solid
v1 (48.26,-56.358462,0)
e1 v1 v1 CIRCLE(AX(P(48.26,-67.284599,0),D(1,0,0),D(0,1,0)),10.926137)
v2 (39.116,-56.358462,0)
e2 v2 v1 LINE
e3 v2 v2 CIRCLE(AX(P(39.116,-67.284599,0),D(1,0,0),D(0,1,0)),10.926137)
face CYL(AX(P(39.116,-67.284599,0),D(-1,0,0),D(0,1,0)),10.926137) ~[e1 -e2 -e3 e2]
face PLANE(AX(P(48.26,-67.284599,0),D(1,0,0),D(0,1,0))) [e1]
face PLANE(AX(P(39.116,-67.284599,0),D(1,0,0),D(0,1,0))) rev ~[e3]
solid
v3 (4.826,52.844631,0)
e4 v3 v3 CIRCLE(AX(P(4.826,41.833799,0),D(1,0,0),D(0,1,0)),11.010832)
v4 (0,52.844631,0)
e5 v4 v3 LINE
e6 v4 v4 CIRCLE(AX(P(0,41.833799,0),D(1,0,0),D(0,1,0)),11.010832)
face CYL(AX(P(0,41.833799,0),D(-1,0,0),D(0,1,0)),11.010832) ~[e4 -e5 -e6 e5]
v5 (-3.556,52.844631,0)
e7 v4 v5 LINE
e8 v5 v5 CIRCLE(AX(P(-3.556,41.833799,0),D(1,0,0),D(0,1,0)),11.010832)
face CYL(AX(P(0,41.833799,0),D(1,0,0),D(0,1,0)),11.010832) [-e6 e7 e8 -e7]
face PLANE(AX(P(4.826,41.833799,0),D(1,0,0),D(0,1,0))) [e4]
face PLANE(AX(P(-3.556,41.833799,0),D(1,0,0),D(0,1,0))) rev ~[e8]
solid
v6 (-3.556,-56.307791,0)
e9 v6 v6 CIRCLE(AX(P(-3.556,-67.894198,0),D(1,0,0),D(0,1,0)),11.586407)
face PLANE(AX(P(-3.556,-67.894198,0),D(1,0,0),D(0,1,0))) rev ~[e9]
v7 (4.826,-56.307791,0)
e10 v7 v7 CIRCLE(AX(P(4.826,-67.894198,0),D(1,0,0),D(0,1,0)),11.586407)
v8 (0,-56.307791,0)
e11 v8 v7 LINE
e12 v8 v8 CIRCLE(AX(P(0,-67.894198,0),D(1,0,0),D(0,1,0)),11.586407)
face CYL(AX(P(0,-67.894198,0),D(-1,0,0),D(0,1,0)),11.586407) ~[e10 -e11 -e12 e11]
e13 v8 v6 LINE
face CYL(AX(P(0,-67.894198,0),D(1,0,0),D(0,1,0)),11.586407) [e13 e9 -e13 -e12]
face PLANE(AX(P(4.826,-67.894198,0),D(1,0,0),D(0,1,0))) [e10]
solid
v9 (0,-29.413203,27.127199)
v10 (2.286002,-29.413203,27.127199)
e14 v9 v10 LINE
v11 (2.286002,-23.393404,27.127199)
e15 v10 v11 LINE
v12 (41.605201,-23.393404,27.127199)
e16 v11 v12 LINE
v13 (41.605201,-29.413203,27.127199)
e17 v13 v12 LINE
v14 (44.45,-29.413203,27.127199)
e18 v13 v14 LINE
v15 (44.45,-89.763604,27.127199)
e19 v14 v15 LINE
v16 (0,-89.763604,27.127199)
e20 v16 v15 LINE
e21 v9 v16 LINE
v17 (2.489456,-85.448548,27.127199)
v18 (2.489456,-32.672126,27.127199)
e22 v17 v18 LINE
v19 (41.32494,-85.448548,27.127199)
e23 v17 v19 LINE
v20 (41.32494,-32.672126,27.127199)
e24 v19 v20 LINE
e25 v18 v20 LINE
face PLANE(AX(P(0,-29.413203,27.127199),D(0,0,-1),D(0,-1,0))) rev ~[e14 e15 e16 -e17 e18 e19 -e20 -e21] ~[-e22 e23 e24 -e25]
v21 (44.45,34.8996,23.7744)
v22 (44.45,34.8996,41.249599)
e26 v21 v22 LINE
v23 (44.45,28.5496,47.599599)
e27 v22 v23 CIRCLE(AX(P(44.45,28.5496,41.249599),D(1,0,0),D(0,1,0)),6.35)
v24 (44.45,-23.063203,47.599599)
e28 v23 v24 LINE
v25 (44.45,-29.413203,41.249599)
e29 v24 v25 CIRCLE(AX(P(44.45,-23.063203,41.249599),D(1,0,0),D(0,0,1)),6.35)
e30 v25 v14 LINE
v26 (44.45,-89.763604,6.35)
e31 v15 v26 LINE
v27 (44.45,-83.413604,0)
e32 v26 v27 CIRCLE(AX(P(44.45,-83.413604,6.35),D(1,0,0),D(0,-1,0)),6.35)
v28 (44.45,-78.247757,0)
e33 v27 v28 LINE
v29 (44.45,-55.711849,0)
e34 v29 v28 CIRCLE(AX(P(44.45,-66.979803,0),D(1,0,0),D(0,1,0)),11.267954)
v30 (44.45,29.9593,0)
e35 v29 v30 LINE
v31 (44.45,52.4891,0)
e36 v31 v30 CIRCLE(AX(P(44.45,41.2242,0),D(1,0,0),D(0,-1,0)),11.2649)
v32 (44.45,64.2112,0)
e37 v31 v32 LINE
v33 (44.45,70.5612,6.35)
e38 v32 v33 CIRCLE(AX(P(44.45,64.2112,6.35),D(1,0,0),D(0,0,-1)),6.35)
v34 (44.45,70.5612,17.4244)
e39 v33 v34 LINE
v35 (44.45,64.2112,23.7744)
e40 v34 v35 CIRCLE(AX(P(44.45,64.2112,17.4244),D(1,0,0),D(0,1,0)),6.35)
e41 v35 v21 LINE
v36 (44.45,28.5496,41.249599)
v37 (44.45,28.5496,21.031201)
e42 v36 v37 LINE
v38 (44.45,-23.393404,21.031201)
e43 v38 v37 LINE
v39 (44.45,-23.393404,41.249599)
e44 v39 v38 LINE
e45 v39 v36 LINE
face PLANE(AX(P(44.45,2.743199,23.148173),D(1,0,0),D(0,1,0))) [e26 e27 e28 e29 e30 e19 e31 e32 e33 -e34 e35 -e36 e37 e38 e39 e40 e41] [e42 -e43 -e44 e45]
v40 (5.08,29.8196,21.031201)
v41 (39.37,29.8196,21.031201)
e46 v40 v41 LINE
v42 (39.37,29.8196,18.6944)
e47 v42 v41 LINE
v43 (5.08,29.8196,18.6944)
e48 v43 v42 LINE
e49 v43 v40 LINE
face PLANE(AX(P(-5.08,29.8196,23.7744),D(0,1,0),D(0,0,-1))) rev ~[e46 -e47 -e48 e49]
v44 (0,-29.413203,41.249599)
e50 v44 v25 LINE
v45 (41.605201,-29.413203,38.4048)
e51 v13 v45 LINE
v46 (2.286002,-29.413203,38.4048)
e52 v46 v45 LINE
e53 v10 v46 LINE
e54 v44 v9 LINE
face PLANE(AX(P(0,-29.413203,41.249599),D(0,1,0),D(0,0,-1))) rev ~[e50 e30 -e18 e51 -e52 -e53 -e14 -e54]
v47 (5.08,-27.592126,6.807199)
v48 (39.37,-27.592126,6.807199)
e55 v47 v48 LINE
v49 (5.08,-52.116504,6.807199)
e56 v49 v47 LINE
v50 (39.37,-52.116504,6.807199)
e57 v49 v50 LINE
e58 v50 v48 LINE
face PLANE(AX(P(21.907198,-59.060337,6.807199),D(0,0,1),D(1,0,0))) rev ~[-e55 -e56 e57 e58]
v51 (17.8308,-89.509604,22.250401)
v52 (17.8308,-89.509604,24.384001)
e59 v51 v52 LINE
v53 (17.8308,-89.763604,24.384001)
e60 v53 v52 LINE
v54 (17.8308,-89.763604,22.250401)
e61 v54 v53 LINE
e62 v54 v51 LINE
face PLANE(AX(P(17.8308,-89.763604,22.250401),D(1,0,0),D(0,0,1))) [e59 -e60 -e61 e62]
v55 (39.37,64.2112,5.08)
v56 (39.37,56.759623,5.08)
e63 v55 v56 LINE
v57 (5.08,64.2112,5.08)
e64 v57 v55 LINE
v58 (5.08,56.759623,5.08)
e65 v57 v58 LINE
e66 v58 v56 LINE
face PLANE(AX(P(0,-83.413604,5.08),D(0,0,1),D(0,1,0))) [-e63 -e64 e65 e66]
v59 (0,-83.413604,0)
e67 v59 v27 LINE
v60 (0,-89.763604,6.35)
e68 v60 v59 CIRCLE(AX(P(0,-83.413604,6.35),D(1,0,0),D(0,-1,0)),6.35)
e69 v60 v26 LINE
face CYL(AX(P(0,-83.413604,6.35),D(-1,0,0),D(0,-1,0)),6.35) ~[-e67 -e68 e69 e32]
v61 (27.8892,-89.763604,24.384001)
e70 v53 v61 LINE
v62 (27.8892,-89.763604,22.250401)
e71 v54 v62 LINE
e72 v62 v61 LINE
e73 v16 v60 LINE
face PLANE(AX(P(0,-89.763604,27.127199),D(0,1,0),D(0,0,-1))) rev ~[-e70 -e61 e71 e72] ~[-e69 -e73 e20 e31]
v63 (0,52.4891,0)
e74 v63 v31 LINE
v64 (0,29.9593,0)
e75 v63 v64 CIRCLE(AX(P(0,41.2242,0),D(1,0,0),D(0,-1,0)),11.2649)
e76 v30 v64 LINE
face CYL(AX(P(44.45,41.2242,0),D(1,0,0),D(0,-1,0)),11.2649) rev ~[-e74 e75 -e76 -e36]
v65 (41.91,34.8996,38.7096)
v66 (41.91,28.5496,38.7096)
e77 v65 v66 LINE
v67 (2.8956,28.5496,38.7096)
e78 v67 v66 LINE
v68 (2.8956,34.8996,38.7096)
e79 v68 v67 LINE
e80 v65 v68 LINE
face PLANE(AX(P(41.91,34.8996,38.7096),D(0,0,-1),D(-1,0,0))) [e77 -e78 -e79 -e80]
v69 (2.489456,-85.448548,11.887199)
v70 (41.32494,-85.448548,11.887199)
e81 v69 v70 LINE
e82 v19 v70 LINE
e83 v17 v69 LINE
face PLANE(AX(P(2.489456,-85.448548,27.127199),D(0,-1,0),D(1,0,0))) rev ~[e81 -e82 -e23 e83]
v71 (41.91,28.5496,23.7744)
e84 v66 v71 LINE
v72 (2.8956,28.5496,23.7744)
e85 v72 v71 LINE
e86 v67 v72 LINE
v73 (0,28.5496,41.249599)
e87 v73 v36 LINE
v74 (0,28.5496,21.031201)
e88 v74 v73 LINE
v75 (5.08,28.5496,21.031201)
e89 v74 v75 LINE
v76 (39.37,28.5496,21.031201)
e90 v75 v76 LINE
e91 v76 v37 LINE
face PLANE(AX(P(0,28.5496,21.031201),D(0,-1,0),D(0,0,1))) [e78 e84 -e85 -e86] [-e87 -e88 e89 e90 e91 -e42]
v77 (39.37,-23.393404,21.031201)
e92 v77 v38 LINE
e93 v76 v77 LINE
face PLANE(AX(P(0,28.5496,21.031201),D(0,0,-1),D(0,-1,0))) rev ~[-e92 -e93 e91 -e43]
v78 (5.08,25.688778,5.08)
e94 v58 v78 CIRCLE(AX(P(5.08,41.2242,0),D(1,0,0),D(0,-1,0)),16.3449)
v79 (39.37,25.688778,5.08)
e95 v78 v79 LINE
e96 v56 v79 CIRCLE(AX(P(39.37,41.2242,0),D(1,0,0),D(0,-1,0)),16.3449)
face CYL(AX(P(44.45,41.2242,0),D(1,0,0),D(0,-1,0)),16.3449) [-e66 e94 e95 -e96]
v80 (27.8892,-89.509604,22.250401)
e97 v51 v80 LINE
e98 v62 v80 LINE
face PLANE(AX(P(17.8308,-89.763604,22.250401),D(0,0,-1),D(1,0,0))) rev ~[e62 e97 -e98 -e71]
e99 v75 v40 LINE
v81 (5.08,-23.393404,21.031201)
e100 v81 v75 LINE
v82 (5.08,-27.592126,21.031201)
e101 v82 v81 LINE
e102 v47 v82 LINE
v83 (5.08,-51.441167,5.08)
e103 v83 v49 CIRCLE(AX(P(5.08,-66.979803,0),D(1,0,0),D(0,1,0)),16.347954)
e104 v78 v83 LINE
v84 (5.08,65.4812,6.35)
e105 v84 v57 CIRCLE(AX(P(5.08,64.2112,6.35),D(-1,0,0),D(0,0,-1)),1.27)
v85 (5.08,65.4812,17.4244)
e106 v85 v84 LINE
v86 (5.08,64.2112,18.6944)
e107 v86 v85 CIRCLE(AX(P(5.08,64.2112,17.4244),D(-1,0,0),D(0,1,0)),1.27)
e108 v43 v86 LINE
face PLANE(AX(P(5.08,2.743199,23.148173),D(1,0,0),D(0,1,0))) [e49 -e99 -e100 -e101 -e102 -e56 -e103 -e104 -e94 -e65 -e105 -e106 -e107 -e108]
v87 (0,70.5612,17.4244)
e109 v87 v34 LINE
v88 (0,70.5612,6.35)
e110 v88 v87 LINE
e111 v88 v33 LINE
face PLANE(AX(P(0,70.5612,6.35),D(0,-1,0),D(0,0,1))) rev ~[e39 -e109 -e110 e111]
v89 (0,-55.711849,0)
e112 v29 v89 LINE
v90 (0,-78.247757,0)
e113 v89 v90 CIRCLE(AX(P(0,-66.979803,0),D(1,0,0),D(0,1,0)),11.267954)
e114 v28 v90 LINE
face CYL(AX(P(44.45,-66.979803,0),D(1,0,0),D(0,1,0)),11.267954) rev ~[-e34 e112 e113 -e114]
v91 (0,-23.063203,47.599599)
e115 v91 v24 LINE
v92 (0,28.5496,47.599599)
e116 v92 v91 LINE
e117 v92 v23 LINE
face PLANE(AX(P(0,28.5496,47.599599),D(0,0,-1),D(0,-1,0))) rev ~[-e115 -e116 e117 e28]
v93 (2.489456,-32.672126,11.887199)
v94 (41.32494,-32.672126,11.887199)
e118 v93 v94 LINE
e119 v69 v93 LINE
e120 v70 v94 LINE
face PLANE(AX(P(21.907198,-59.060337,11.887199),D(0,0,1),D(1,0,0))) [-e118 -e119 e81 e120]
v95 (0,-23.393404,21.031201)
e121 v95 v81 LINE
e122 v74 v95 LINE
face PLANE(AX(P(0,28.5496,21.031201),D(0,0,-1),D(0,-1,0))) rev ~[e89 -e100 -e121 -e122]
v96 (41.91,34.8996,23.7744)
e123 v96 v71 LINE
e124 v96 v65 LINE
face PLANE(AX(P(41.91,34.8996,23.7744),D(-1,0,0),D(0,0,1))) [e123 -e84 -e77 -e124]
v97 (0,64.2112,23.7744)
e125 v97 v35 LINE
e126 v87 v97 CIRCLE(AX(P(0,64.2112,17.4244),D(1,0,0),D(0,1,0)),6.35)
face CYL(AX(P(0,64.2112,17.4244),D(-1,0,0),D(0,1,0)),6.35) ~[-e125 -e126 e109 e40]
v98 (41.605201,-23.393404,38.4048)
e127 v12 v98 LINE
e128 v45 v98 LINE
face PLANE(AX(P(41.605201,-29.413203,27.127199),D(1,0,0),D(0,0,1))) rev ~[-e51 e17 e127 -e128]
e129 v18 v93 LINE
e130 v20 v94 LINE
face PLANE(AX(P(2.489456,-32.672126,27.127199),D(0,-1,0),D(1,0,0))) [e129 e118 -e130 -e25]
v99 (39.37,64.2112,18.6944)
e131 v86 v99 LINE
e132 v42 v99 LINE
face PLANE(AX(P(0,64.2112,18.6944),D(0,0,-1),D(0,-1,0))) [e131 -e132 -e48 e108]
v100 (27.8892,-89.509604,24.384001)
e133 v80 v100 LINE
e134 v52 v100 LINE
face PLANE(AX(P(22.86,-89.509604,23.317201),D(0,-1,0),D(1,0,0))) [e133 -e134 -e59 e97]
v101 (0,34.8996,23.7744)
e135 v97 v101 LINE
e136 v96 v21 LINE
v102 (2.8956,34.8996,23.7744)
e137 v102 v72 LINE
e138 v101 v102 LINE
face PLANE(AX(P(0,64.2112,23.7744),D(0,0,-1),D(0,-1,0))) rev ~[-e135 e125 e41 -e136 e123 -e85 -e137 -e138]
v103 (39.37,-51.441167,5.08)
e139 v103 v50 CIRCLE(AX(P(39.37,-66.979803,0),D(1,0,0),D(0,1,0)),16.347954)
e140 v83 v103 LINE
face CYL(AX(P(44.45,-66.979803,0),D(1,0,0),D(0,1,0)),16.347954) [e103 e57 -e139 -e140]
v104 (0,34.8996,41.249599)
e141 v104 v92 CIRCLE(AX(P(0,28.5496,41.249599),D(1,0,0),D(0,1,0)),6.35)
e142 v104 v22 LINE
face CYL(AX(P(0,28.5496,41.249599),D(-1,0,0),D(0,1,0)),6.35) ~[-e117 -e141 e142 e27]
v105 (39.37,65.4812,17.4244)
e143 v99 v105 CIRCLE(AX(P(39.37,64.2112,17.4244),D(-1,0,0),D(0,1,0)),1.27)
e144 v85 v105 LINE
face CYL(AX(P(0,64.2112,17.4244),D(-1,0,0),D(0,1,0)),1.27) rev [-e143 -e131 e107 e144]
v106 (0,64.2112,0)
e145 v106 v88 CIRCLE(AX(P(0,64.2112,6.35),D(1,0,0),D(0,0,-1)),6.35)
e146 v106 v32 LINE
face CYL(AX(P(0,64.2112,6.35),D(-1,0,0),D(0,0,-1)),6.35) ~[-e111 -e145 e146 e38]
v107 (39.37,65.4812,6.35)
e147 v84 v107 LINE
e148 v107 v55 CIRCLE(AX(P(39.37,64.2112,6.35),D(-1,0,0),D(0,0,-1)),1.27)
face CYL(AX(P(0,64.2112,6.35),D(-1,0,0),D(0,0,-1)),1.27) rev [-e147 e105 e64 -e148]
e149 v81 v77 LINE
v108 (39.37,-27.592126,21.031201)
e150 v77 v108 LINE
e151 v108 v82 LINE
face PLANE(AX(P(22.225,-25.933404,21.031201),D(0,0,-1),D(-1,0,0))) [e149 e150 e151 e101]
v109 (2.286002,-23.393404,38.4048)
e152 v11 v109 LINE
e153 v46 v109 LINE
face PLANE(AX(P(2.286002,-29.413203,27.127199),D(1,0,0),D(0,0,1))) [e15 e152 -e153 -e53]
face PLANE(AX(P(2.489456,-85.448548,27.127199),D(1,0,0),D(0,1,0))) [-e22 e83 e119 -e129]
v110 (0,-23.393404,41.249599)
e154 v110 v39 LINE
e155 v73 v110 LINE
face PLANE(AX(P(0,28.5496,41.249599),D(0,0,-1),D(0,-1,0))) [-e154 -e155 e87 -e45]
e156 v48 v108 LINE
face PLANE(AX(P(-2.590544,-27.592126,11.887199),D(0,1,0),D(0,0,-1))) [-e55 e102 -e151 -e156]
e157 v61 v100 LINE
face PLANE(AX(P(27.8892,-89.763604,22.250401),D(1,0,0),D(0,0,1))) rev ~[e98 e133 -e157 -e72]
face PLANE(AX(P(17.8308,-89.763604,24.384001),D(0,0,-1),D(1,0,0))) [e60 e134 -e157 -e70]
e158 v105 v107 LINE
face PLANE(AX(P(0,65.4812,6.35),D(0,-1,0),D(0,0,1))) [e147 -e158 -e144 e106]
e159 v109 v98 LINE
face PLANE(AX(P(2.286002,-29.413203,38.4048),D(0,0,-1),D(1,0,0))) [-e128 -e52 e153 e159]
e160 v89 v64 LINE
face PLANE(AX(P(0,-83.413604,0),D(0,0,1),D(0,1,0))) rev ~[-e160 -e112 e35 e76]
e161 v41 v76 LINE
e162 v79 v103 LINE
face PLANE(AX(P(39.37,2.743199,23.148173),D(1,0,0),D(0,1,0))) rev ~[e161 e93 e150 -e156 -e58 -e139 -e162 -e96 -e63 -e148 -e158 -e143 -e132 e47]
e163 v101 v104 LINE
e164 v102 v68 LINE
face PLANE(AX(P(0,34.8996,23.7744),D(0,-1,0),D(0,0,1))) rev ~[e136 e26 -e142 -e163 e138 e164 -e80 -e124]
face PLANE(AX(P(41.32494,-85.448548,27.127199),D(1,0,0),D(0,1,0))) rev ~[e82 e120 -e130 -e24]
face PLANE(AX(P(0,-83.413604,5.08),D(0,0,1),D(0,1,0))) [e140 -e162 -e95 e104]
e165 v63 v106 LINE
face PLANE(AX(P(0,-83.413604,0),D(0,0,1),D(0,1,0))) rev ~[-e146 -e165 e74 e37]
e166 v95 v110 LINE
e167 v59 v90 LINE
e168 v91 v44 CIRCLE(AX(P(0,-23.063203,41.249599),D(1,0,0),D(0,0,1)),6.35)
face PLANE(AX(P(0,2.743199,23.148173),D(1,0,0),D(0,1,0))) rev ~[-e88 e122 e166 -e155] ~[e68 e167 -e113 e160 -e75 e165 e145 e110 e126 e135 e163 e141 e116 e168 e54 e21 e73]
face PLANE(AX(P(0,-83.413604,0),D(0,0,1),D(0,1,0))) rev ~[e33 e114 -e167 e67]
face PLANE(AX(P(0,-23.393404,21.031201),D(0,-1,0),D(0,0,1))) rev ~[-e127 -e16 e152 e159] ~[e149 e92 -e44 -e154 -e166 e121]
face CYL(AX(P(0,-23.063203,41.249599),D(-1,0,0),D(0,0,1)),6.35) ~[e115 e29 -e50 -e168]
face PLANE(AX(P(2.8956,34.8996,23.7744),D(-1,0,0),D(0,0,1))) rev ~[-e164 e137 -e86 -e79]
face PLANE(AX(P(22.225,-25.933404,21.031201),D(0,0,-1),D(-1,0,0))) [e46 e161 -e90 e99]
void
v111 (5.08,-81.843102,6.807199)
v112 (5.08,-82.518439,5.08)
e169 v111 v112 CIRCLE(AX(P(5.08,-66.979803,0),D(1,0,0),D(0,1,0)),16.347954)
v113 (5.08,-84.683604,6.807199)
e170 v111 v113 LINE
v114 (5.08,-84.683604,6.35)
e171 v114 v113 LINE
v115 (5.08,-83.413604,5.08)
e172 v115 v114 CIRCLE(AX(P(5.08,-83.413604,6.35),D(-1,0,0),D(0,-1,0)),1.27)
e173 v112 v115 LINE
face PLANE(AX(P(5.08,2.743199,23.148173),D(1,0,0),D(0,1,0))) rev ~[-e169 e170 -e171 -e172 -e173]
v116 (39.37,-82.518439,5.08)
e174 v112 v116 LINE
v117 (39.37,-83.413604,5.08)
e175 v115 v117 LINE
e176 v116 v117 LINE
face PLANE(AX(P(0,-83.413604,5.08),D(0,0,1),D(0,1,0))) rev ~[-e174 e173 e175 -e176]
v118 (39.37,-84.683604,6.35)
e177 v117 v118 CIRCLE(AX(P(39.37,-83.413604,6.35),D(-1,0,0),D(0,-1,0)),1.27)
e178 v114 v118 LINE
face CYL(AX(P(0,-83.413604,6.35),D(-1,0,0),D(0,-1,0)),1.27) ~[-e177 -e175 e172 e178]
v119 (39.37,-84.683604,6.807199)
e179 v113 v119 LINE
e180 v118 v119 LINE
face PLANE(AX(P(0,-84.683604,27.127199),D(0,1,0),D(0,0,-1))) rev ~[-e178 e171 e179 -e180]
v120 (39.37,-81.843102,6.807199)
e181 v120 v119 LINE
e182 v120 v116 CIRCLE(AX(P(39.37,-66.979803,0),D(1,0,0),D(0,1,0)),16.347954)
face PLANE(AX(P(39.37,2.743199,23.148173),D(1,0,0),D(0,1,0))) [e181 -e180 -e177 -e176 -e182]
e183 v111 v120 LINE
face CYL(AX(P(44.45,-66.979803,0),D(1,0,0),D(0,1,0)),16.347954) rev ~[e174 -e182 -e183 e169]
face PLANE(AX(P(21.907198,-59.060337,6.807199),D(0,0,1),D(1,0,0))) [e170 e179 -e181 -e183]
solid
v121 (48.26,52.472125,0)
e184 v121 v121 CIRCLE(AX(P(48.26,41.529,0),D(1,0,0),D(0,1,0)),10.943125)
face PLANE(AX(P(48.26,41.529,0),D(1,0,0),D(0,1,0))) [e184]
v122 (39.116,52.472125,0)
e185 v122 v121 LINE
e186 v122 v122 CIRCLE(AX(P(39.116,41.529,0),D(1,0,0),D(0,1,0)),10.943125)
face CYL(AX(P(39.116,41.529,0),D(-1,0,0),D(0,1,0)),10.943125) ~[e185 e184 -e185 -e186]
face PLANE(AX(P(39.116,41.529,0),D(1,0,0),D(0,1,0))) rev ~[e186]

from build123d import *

# Parameters (mm, degrees)
F1_DEPTH      = 44.45
F3_DEPTH      = 46.99
F4_W          = 38.835483836
F4_H          = 52.7764223516
F5_DEPTH      = 15.24
F7_START      = 39.116
F6_R          = 10.9261370184
F7_DEPTH      = 9.144
F6_R_2        = 10.9431249162
F8_R          = 11.010831959
F9_DEPTH      = 3.556
F9_DEPTH_BACK = 4.826
F8_R_2        = 11.5864067576
F10_W         = 10.0583992898
F10_H         = 2.1336004138
F11_DEPTH     = 0.254
F12_W         = 51.9430035889
F12_H         = 20.2183979881
F13_DEPTH     = 55.118
F14_W         = 39.3191990443
F14_H         = 11.2776011229
F15_DEPTH     = 25.4
F16_T         = 5.08
F16_T3_DEPTH  = 54.61
F16_T5_DEPTH  = 12.4460015742
F16_T7_DEPTH  = 13.0047993815
F16_T9_DEPTH  = 16.1797990388
F16_T11_DEPTH = 25.4
F16_T13_DEPTH = 62.9364223516
F16_T15_DEPTH = 48.995483836
F16_T17_DEPTH = 10.414
F16_T19_DEPTH = 12.2936004138
F16_T21_DEPTH = 20.2183992898
F17_W         = 39.0143997502
F17_H         = 14.9351991713
F18_DEPTH     = 25.4


# Not quite as in the source:
# - a shell that OpenCascade refuses in one call is made with other operations: the cavity is built on its own and cut out


with BuildPart() as f1:
    # F0 (on Right) → F1 (new body)
    with BuildSketch(Plane.YZ):
        with BuildLine():
            Line((34.8995998502, 0), (34.8995998502, 23.7744003534))
            Line((34.8995998502, 23.7744003534), (34.8995998502, 41.2495988739))
            ThreePointArc((34.8995998502, 41.2495988739), (33.0397279107, 45.7397269344), (28.5495998502, 47.5995988739))
            Line((28.5495998502, 47.5995988739), (-23.0632027775, 47.5995988739))
            ThreePointArc((-23.0632027775, 47.5995988739), (-27.553330838, 45.7397269344), (-29.4132027775, 41.2495988739))
            Line((-29.4132027775, 41.2495988739), (-29.4132027775, 27.127198875))
            Line((-29.4132027775, 27.127198875), (-29.4132027775, 0))
            Line((-29.4132027775, 0), (34.8995998502, 0))
        make_face()
        with BuildLine():
            Line((-83.4136041045, 0), (-29.4132027775, 0))
            Line((-29.4132027775, 0), (-29.4132027775, 27.127198875))
            Line((-29.4132027775, 27.127198875), (-89.7636041045, 27.127198875))
            Line((-89.7636041045, 27.127198875), (-89.7636041045, 6.35))
            ThreePointArc((-89.7636041045, 6.35), (-87.9037321651, 1.8598719395), (-83.4136041045, 0))
        make_face()
        with BuildLine():
            Line((64.2112003803, 23.7744003534), (34.8995998502, 23.7744003534))
            Line((34.8995998502, 23.7744003534), (34.8995998502, 0))
            Line((34.8995998502, 0), (64.2112003803, 0))
            ThreePointArc((64.2112003803, 0), (68.7013284409, 1.8598719395), (70.5612003803, 6.35))
            Line((70.5612003803, 6.35), (70.5612003803, 17.4244003534))
            ThreePointArc((70.5612003803, 17.4244003534), (68.7013284409, 21.914528414), (64.2112003803, 23.7744003534))
        make_face()
    extrude(amount=F1_DEPTH)

    # F2 (on face) → F3 (cut)
    with BuildSketch(Plane.YZ.offset(44.45)):
        with BuildLine():
            ThreePointArc((52.4891002785, 0), (41.2242002785, 11.2649), (29.9593002785, 0))
            Line((29.9593002785, 0), (52.4891002785, 0))
        make_face()
        with BuildLine():
            Line((-78.2477574524, 0), (-55.7118488375, 0))
            ThreePointArc((-55.7118488375, 0), (-66.9798031449, 11.2679543074), (-78.2477574524, 0))
        make_face()
        with BuildLine():
            Line((52.4891002785, 0), (29.9593002785, 0))
            ThreePointArc((29.9593002785, 0), (41.2242002785, -11.2649), (52.4891002785, 0))
        make_face()
        with BuildLine():
            ThreePointArc((-78.2477574524, 0), (-66.9798031449, -11.2679543074), (-55.7118488375, 0))
            Line((-55.7118488375, 0), (-78.2477574524, 0))
        make_face()
    extrude(amount=-F3_DEPTH, mode=Mode.SUBTRACT)

    # F4 (on face) → F5 (cut)
    with BuildSketch(Plane.XY.offset(27.127198875)):
        with Locations((21.9071976608, -59.0603370219)):
            Rectangle(F4_W, F4_H)
    extrude(amount=-F5_DEPTH, mode=Mode.SUBTRACT)

    # F10 (on face) → F11 (cut)
    with BuildSketch(Plane.XZ.offset(89.7636041045)):
        with Locations((22.85999991, 23.317201063)):
            Rectangle(F10_W, F10_H)
    extrude(amount=-F11_DEPTH, mode=Mode.SUBTRACT)

    # F12 (on face) → F13 (cut)
    with BuildSketch(Plane(origin=(0, 0, 0), x_dir=(0, -1, 0), z_dir=(-1, 0, 0))):
        with Locations((-2.5780980557, 31.1403998798)):
            Rectangle(F12_W, F12_H)
    extrude(amount=-F13_DEPTH, mode=Mode.SUBTRACT)

    # F14 (on face) → F15 (cut)
    with BuildSketch(Plane.XZ.offset(29.4132027775)):
        with Locations((21.9456010964, 32.7659994364)):
            Rectangle(F14_W, F14_H)
    extrude(amount=-F15_DEPTH, mode=Mode.SUBTRACT)

    # F16: shell of thickness 5.08, made by hand


with BuildPart() as f7:
    # F6 (on Right) → F7 (new body)
    with BuildSketch(Plane.YZ.offset(F7_START)):
        with Locations((-67.2845989466, 0)):
            Circle(F6_R)
    extrude(amount=F7_DEPTH)


with BuildPart() as f7b:
    # F6 (on Right) → F7, piece 2 (new body)
    with BuildSketch(Plane.YZ.offset(F7_START)):
        with Locations((41.5289998055, 0)):
            Circle(F6_R_2)
    extrude(amount=F7_DEPTH)


with BuildPart() as f9:
    # F8 (on Right) → F9 (new body, two sides)
    with BuildSketch(Plane.YZ) as f9_sk:
        with Locations((41.8337993324, 0)):
            Circle(F8_R)
    extrude(amount=-F9_DEPTH)
    extrude(f9_sk.sketch, amount=F9_DEPTH_BACK)


with BuildPart() as f9b:
    # F8 (on Right) → F9, piece 2 (new body, two sides)
    with BuildSketch(Plane.YZ) as f9_2_sk:
        with Locations((-67.8941980004, 0)):
            Circle(F8_R_2)
    extrude(amount=-F9_DEPTH)
    extrude(f9_2_sk.sketch, amount=F9_DEPTH_BACK)


with BuildPart() as f16_core1:
    # F16_t2: copy of F1
    add(f1.part)

    # the walls: a layer under each face that stays
    f16_faces = [f16_core1.faces().sort_by_distance(p)[0] for p in [
        (22.225, 34.8995998502, 32.5119996136),
        (22.225, 49.5554001153, 23.7744003534),
        (22.225, 33.0397279107, 45.7397269344),
        (0, -63.042803357, 23.7997994369),
        (44.45, -63.042803357, 23.7997994369),
        (22.225, 68.7013284409, 21.914528414),
        (22.225, 2.7431985363, 47.5995988739),
        (22.225, 70.5612003803, 11.8872001767),
        (22.225, 68.7013284409, 1.8598719395),
        (22.225, 58.3501503294, 0),
        (22.225, -27.553330838, 45.7397269344),
        (22.225, 41.2242002785, 11.2649),
        (37.0416666667, -29.4132027775, 38.8958655407),
        (22.225, -12.8762742795, 0),
        (41.275, -28.1341323363, 27.127198875),
        (22.225, -66.9798031449, 11.2679543074),
        (22.225, -89.7636041045, 16.7385994375),
        (22.225, -80.8306807784, 0),
        (22.225, -87.9037321651, 1.8598719395),
        (22.225, 28.5495998502, 31.1403998798),
        (22.225, 2.5780980557, 41.2495988739),
        (37.0416666667, -23.3934037387, 24.4009338838),
        (2.2860015742, -26.4033032581, 32.7659994364),
        (21.9456010964, -26.4033032581, 38.4047999978),
        (41.6052006185, -26.4033032581, 32.7659994364),
        (41.3249395788, -59.0603370219, 19.507198875),
        (21.9071976608, -85.4485481977, 19.507198875),
        (2.4894557428, -59.0603370219, 19.507198875),
        (21.9071976608, -32.6721258461, 19.507198875),
        (27.8891995549, -89.6366041045, 23.317201063),
        (22.85999991, -89.6366041045, 22.2504008561),
        (17.8308002651, -89.6366041045, 23.317201063),
        (22.85999991, -89.6366041045, 24.3840012699),
        (21.9071976608, -59.0603370219, 11.887198875),
        (22.85999991, -89.5096041045, 23.317201063),
    ]]
    thicken(f16_faces, amount=-F16_T, mode=Mode.SUBTRACT)

    # F16_s4 → F16_t3 (cut)
    with BuildSketch(Plane.YZ.offset(-5.08)):
        Polygon((34.9503998502, 23.8252003534), (29.8195998502, 23.7744003534), (29.8195998502, 18.6944003534), (34.8995998502, 18.6944003534), align=None)
        Polygon((28.4987998502, 41.1987988739), (33.6295998502, 41.2495988739), (33.6295998502, 46.3295988739), (28.5495998502, 46.3295988739), align=None)
        Polygon((-23.3426037387, 41.1987988739), (-23.3934037387, 46.3295988739), (-28.4734037387, 46.3295988739), (-28.4734037387, 41.2495988739), align=None)
    extrude(amount=F16_T3_DEPTH, mode=Mode.SUBTRACT)

    # F16_s6 → F16_t5 (cut)
    with BuildSketch(Plane.YZ.offset(-5.08)):
        Polygon((-29.4640027775, 27.177998875), (-24.3332027775, 27.127198875), (-24.3332027775, 22.047198875), (-29.4132027775, 22.047198875), align=None)
    extrude(amount=F16_T5_DEPTH, mode=Mode.SUBTRACT)

    # F16_s8 → F16_t7 (cut)
    with BuildSketch(Plane.YZ.offset(36.5252006185)):
        Polygon((-29.4640027775, 27.177998875), (-24.3332027775, 27.127198875), (-24.3332027775, 22.047198875), (-29.4132027775, 22.047198875), align=None)
    extrude(amount=F16_T7_DEPTH, mode=Mode.SUBTRACT)

    # F16_s10 → F16_t9 (cut)
    with BuildSketch(Plane.XZ.offset(18.3134037387)):
        Polygon((2.3368015742, 27.177998875), (2.2860015742, 22.047198875), (-2.7939984258, 22.047198875), (-2.7939984258, 27.127198875), align=None)
        Polygon((41.5544006185, 27.177998875), (41.6052006185, 22.047198875), (46.6852006185, 22.047198875), (46.6852006185, 27.127198875), align=None)
        Polygon((2.3368015742, 38.3539999978), (-2.7939984258, 38.4047999978), (-2.7939984258, 43.4847999978), (2.2860015742, 43.4847999978), align=None)
        Polygon((41.5544006185, 38.3539999978), (41.6052006185, 43.4847999978), (46.6852006185, 43.4847999978), (46.6852006185, 38.4047999978), align=None)
    extrude(amount=F16_T9_DEPTH, mode=Mode.SUBTRACT)

    # F16_s12 → F16_t11 (cut)
    with BuildSketch(Plane.XY.offset(6.807198875)):
        Polygon((41.2741395788, -85.3977481977), (46.4049395788, -85.4485481977), (46.4049395788, -90.5285481977), (41.3249395788, -90.5285481977), align=None)
        Polygon((41.2741395788, -32.7229258461), (46.4049395788, -32.6721258461), (46.4049395788, -27.5921258461), (41.3249395788, -27.5921258461), align=None)
        Polygon((2.5402557428, -85.3977481977), (2.4894557428, -90.5285481977), (-2.5905442572, -90.5285481977), (-2.5905442572, -85.4485481977), align=None)
        Polygon((2.5402557428, -32.7229258461), (-2.5905442572, -32.6721258461), (-2.5905442572, -27.5921258461), (2.4894557428, -27.5921258461), align=None)
    extrude(amount=F16_T11_DEPTH, mode=Mode.SUBTRACT)

    # F16_s14 → F16_t13 (cut)
    with BuildSketch(Plane.XZ.offset(27.5921258461)):
        Polygon((41.2741395788, 11.937998875), (46.4049395788, 11.887198875), (46.4049395788, 6.807198875), (41.3249395788, 6.807198875), align=None)
        Polygon((2.5402557428, 11.937998875), (-2.5905442572, 11.887198875), (-2.5905442572, 6.807198875), (2.4894557428, 6.807198875), align=None)
    extrude(amount=F16_T13_DEPTH, mode=Mode.SUBTRACT)

    # F16_s16 → F16_t15 (cut)
    with BuildSketch(Plane.YZ.offset(-2.5905442572)):
        Polygon((-85.3977481977, 11.937998875), (-90.5285481977, 11.887198875), (-90.5285481977, 6.807198875), (-85.4485481977, 6.807198875), align=None)
        Polygon((-32.7229258461, 11.937998875), (-27.5921258461, 11.887198875), (-27.5921258461, 6.807198875), (-32.6721258461, 6.807198875), align=None)
    extrude(amount=F16_T15_DEPTH, mode=Mode.SUBTRACT)

    # F16_s18 → F16_t17 (cut)
    with BuildSketch(Plane.XZ.offset(84.4296041045)):
        Polygon((27.8383995549, 22.3012008561), (32.9691995549, 22.2504008561), (32.9691995549, 17.1704008561), (27.8891995549, 17.1704008561), align=None)
        Polygon((27.8383995549, 24.3332012699), (32.9691995549, 24.3840012699), (32.9691995549, 29.4640012699), (27.8891995549, 29.4640012699), align=None)
        Polygon((17.8816002651, 22.3012008561), (17.8308002651, 17.1704008561), (12.7508002651, 17.1704008561), (12.7508002651, 22.2504008561), align=None)
        Polygon((17.8816002651, 24.3332012699), (12.7508002651, 24.3840012699), (12.7508002651, 29.4640012699), (17.8308002651, 29.4640012699), align=None)
    extrude(amount=F16_T17_DEPTH, mode=Mode.SUBTRACT)

    # F16_s20 → F16_t19 (cut)
    with BuildSketch(Plane.XY.offset(17.1704008561)):
        Polygon((27.8383995549, -89.5604041045), (32.9691995549, -89.5096041045), (32.9691995549, -84.4296041045), (27.8891995549, -84.4296041045), align=None)
        Polygon((17.8816002651, -89.5604041045), (12.7508002651, -89.5096041045), (12.7508002651, -84.4296041045), (17.8308002651, -84.4296041045), align=None)
    extrude(amount=F16_T19_DEPTH, mode=Mode.SUBTRACT)

    # F16_s22 → F16_t21 (cut)
    with BuildSketch(Plane.YZ.offset(12.7508002651)):
        Polygon((-89.5604041045, 22.3012008561), (-89.5096041045, 17.1704008561), (-84.4296041045, 17.1704008561), (-84.4296041045, 22.2504008561), align=None)
        Polygon((-89.5604041045, 24.3332012699), (-89.5096041045, 29.4640012699), (-84.4296041045, 29.4640012699), (-84.4296041045, 24.3840012699), align=None)
    extrude(amount=F16_T21_DEPTH, mode=Mode.SUBTRACT)


with BuildPart() as f1_1:
    add(f1.part)

    # what is left inside the walls is the cavity
    f16_cavity = [f16_core1.part.solids().sort_by_distance(p)[0] for p in [
        (27.94, -12.876195, 5.1308),
        (22.225, -83.73677, 6.756399),
    ]]
    add(f16_cavity, mode=Mode.SUBTRACT)

    # F17 (on face) → F18 (cut)
    with BuildSketch(Plane(origin=(0, 34.8995998502, 0), x_dir=(-1, 0, 0), z_dir=(0, 1, 0))):
        with Locations((-22.4028002704, 31.2419999391)):
            Rectangle(F17_W, F17_H)
    extrude(amount=-F18_DEPTH, mode=Mode.SUBTRACT)


solid = Compound([f7.part, f7b.part, f9.part, f9b.part, f1_1.part])
